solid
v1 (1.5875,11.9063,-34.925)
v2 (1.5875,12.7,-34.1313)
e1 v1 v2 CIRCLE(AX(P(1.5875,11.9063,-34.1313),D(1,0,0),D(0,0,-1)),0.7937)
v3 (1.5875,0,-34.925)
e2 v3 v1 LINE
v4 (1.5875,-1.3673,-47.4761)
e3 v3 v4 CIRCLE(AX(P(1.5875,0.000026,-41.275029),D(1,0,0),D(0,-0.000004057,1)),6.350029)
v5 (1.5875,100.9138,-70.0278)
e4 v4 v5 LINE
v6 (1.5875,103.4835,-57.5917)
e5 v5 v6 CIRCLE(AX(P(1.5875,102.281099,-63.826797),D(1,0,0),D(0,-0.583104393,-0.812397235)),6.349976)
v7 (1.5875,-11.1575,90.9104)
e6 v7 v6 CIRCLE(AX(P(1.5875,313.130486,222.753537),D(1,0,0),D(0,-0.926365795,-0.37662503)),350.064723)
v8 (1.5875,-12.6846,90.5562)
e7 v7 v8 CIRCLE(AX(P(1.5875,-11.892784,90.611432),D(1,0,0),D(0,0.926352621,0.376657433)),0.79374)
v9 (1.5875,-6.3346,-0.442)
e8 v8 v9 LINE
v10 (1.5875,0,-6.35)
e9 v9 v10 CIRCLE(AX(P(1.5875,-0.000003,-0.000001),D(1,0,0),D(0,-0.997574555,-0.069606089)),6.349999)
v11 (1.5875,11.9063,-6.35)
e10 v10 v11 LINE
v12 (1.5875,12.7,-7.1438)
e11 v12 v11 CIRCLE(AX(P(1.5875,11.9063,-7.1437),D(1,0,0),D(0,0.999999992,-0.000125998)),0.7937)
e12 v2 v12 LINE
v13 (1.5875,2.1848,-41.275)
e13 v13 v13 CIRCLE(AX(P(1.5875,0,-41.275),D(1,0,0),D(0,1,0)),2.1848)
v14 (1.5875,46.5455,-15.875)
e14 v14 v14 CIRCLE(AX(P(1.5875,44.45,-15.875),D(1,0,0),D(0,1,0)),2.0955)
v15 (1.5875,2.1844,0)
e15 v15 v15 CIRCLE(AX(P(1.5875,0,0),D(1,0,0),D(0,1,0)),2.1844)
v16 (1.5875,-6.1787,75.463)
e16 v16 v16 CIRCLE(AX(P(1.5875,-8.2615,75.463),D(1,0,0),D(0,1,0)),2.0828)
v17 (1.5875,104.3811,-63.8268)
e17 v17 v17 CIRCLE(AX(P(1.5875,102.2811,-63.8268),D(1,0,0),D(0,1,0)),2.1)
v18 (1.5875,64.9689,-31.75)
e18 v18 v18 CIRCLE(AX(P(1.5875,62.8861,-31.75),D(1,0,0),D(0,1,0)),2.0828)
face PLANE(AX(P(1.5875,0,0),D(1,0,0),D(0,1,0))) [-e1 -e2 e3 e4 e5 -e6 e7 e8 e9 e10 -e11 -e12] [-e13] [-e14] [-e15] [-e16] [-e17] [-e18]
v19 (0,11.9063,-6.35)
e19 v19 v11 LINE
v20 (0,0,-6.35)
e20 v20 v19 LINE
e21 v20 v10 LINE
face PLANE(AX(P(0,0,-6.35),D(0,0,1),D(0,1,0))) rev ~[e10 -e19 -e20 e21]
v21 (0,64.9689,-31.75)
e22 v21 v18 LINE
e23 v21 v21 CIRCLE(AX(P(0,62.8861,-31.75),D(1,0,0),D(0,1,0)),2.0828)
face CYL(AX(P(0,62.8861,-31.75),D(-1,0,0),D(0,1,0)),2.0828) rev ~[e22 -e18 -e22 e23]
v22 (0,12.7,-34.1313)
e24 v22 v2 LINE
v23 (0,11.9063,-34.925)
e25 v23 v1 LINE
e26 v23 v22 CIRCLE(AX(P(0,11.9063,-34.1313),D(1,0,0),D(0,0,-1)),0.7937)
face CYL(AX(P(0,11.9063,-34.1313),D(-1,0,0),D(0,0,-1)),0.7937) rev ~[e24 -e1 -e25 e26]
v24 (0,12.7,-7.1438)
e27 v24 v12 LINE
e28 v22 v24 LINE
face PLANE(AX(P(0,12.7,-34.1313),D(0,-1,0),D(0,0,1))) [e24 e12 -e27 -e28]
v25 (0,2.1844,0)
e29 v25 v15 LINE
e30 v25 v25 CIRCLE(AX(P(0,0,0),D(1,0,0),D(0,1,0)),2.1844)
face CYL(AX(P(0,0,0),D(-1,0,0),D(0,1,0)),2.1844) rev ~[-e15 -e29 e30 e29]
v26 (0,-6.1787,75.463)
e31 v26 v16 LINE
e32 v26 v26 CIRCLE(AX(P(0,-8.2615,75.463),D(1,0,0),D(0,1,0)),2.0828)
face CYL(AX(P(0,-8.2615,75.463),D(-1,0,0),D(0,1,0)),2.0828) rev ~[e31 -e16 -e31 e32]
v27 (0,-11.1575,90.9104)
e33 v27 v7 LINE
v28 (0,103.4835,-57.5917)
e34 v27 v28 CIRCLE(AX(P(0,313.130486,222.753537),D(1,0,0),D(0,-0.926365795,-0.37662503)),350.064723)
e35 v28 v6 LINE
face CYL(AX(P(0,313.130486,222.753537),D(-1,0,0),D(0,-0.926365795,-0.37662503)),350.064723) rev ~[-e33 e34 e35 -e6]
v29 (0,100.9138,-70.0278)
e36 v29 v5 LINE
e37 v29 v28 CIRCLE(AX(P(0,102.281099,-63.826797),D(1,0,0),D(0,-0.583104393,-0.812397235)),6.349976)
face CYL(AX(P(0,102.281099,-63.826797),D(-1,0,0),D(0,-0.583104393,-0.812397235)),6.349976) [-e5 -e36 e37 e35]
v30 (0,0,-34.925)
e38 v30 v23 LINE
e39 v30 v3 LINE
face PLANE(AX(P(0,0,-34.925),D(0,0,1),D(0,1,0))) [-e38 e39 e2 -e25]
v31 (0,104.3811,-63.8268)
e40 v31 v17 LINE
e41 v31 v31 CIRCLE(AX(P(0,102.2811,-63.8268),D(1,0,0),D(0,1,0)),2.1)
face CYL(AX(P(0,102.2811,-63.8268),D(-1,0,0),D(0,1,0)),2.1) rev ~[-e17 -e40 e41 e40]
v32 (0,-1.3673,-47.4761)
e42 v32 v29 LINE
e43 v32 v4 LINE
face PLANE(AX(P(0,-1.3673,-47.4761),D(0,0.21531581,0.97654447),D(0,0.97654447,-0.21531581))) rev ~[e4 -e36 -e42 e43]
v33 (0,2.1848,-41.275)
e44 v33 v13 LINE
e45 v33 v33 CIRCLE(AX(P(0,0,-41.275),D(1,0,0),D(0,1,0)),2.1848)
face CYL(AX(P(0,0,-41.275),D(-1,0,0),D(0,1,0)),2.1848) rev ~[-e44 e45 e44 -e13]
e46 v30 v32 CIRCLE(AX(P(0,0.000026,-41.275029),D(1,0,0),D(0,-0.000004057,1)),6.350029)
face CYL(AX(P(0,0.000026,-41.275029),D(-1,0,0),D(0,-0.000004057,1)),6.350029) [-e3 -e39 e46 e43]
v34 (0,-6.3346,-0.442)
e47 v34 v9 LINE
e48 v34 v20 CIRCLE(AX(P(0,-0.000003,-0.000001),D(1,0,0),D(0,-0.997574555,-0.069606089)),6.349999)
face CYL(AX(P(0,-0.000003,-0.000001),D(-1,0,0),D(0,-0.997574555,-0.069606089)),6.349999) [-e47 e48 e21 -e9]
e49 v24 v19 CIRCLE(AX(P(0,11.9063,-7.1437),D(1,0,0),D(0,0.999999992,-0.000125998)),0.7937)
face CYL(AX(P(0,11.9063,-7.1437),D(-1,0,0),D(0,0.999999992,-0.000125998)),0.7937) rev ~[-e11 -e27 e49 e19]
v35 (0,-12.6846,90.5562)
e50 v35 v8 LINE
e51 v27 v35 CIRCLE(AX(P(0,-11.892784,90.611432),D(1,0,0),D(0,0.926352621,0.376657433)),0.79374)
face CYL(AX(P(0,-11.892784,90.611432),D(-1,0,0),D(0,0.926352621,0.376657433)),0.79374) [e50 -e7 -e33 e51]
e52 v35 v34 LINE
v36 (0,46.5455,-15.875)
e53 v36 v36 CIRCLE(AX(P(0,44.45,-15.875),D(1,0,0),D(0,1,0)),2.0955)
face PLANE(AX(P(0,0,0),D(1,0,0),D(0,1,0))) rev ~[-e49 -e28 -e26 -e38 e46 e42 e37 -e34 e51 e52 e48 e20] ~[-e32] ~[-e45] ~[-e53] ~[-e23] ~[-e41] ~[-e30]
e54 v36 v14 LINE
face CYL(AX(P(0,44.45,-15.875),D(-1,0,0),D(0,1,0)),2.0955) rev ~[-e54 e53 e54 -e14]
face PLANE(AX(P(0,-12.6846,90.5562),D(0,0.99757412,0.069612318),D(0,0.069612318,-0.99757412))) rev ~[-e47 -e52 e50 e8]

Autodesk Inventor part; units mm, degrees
ref_plane "YZ Plane" through (0, 0, 0) normal (1, 0, 0) x (0, 1, 0)
ref_plane "XZ Plane" through (0, 0, 0) normal (0, 1, 0) x (-1, 0, 0)
ref_plane "XY Plane" through (0, 0, 0) normal (0, 0, 1) x (1, 0, 0)
sketch "main" plane through (0, 0, 0) normal (0, 0, 1) x (1, 0, 0)
  circle A0 centre (-198.1135, 49.9495) radius 2.1844
  circle A1 centre (-95.8324, -13.8772) radius 2.1
  arc A2 (-99.5351, -19.036) -> (-94.63, -7.6421) centre (-95.8324, -13.8772) ccw
  arc A3 (-204.4481, 49.5075) -> (-198.1135, 43.5995) centre (-198.1135, 49.9495) ccw
  line L0 (-210.7981, 140.5057) -> (-204.4481, 49.5075)
  arc A4 (-209.271, 140.8599) -> (-94.63, -7.6421) centre (115.0165, 272.7027) ccw
  circle A5 centre (-206.375, 125.4125) radius 2.0828
  line L1 (-198.1135, 43.5995) -> (-186.2072, 43.5995)
  arc A6 (-209.271, 140.8599) -> (-210.7981, 140.5057) centre (-210.0063, 140.561) ccw
  circle A7 centre (-135.2274, 18.1995) radius 2.0828
  line L2 (-185.4135, 15.8183) -> (-185.4135, 42.8058)
  line L3 (-198.1135, 15.0245) -> (-186.2072, 15.0245)
  arc A8 (-185.4135, 42.8058) -> (-186.2072, 43.5995) centre (-186.2072, 42.8058) ccw
  arc A9 (-186.2072, 15.0245) -> (-185.4135, 15.8183) centre (-186.2072, 15.8183) ccw
  line L4 (-199.4808, 2.4735) -> (-97.1997, -20.0783)
  circle A10 centre (-198.1135, 8.6745) radius 2.1848
  arc A11 (-198.1135, 15.0245) -> (-199.4808, 2.4735) centre (-198.1135, 8.6745) ccw
  point P0 (1.1251, 9.7944)
  point P1 (-211.1526, 145.5863)
  point P2 (-191.7635, 49.9495)
  dimension "d7" = 12.7
  dimension "d8" = 4.1656
  dimension "d9" = 6.35
  dimension "d11" = 0.7937
  dimension "d13" = 4.1656
  dimension "d16" = 0.7937
  dimension "d19" = 26.9875
  dimension "d20" = 0
  dimension "d21" = 6.35
  dimension "d24" = 6.35
sketch "Sketch1" plane through (0, 0, 0) normal (1, 0, 0) x (0, 1, 0)
  circle A0 centre (44.45, -15.875) radius 2.0955
  circle A1 centre (0, 0) radius 2.1844
  circle A2 centre (102.2811, -63.8268) radius 2.1
  arc A3 (98.5784, -68.9855) -> (103.4835, -57.5917) centre (102.2811, -63.8268) ccw
  arc A4 (-6.3346, -0.442) -> (0, -6.35) centre (0, 0) ccw
  line L0 (-12.6846, 90.5562) -> (-6.3346, -0.442)
  arc A5 (-11.1575, 90.9104) -> (103.4835, -57.5917) centre (313.1299, 222.7532) ccw
  circle A6 centre (-8.2615, 75.463) radius 2.0828
  line L1 (0, -6.35) -> (11.9063, -6.35)
  arc A7 (-11.1575, 90.9104) -> (-12.6846, 90.5562) centre (-11.8928, 90.6114) ccw
  circle A8 centre (62.8861, -31.75) radius 2.0828
  line L2 (12.7, -34.1313) -> (12.7, -7.1438)
  line L3 (0, -34.925) -> (11.9063, -34.925)
  arc A9 (12.7, -7.1438) -> (11.9063, -6.35) centre (11.9063, -7.1437) ccw
  arc A10 (11.9063, -34.925) -> (12.7, -34.1313) centre (11.9063, -34.1313) ccw
  line L4 (-1.3673, -47.4761) -> (100.9138, -70.0278)
  circle A11 centre (0, -41.275) radius 2.1848
  arc A12 (0, -34.925) -> (-1.3673, -47.4761) centre (0, -41.275) ccw
  dimension "d18" = 4.191
extrude "Extrusion1" add sketch "Sketch1" along normal blind 1.5875
equation "\"BendRadius\" = Thickness"
equation "\"BendReliefWidth\" = Thickness"
equation "\"BendReliefDepth\" = 0.5 * Thickness"
equation "\"CornerReliefSize\" = 4 * Thickness"
equation "\"MinimumRemnant\" = 2 * Thickness"
equation "\"TransitionRadius\" = BendRadius"
equation "\"JacobiRadiusSize\" = BendRadius"
equation "\"GapSize\" = Thickness"
equation "\"Thickness\" = 1.5875"
properties part number "Ramp V2" material "Acetal Resin, White"
